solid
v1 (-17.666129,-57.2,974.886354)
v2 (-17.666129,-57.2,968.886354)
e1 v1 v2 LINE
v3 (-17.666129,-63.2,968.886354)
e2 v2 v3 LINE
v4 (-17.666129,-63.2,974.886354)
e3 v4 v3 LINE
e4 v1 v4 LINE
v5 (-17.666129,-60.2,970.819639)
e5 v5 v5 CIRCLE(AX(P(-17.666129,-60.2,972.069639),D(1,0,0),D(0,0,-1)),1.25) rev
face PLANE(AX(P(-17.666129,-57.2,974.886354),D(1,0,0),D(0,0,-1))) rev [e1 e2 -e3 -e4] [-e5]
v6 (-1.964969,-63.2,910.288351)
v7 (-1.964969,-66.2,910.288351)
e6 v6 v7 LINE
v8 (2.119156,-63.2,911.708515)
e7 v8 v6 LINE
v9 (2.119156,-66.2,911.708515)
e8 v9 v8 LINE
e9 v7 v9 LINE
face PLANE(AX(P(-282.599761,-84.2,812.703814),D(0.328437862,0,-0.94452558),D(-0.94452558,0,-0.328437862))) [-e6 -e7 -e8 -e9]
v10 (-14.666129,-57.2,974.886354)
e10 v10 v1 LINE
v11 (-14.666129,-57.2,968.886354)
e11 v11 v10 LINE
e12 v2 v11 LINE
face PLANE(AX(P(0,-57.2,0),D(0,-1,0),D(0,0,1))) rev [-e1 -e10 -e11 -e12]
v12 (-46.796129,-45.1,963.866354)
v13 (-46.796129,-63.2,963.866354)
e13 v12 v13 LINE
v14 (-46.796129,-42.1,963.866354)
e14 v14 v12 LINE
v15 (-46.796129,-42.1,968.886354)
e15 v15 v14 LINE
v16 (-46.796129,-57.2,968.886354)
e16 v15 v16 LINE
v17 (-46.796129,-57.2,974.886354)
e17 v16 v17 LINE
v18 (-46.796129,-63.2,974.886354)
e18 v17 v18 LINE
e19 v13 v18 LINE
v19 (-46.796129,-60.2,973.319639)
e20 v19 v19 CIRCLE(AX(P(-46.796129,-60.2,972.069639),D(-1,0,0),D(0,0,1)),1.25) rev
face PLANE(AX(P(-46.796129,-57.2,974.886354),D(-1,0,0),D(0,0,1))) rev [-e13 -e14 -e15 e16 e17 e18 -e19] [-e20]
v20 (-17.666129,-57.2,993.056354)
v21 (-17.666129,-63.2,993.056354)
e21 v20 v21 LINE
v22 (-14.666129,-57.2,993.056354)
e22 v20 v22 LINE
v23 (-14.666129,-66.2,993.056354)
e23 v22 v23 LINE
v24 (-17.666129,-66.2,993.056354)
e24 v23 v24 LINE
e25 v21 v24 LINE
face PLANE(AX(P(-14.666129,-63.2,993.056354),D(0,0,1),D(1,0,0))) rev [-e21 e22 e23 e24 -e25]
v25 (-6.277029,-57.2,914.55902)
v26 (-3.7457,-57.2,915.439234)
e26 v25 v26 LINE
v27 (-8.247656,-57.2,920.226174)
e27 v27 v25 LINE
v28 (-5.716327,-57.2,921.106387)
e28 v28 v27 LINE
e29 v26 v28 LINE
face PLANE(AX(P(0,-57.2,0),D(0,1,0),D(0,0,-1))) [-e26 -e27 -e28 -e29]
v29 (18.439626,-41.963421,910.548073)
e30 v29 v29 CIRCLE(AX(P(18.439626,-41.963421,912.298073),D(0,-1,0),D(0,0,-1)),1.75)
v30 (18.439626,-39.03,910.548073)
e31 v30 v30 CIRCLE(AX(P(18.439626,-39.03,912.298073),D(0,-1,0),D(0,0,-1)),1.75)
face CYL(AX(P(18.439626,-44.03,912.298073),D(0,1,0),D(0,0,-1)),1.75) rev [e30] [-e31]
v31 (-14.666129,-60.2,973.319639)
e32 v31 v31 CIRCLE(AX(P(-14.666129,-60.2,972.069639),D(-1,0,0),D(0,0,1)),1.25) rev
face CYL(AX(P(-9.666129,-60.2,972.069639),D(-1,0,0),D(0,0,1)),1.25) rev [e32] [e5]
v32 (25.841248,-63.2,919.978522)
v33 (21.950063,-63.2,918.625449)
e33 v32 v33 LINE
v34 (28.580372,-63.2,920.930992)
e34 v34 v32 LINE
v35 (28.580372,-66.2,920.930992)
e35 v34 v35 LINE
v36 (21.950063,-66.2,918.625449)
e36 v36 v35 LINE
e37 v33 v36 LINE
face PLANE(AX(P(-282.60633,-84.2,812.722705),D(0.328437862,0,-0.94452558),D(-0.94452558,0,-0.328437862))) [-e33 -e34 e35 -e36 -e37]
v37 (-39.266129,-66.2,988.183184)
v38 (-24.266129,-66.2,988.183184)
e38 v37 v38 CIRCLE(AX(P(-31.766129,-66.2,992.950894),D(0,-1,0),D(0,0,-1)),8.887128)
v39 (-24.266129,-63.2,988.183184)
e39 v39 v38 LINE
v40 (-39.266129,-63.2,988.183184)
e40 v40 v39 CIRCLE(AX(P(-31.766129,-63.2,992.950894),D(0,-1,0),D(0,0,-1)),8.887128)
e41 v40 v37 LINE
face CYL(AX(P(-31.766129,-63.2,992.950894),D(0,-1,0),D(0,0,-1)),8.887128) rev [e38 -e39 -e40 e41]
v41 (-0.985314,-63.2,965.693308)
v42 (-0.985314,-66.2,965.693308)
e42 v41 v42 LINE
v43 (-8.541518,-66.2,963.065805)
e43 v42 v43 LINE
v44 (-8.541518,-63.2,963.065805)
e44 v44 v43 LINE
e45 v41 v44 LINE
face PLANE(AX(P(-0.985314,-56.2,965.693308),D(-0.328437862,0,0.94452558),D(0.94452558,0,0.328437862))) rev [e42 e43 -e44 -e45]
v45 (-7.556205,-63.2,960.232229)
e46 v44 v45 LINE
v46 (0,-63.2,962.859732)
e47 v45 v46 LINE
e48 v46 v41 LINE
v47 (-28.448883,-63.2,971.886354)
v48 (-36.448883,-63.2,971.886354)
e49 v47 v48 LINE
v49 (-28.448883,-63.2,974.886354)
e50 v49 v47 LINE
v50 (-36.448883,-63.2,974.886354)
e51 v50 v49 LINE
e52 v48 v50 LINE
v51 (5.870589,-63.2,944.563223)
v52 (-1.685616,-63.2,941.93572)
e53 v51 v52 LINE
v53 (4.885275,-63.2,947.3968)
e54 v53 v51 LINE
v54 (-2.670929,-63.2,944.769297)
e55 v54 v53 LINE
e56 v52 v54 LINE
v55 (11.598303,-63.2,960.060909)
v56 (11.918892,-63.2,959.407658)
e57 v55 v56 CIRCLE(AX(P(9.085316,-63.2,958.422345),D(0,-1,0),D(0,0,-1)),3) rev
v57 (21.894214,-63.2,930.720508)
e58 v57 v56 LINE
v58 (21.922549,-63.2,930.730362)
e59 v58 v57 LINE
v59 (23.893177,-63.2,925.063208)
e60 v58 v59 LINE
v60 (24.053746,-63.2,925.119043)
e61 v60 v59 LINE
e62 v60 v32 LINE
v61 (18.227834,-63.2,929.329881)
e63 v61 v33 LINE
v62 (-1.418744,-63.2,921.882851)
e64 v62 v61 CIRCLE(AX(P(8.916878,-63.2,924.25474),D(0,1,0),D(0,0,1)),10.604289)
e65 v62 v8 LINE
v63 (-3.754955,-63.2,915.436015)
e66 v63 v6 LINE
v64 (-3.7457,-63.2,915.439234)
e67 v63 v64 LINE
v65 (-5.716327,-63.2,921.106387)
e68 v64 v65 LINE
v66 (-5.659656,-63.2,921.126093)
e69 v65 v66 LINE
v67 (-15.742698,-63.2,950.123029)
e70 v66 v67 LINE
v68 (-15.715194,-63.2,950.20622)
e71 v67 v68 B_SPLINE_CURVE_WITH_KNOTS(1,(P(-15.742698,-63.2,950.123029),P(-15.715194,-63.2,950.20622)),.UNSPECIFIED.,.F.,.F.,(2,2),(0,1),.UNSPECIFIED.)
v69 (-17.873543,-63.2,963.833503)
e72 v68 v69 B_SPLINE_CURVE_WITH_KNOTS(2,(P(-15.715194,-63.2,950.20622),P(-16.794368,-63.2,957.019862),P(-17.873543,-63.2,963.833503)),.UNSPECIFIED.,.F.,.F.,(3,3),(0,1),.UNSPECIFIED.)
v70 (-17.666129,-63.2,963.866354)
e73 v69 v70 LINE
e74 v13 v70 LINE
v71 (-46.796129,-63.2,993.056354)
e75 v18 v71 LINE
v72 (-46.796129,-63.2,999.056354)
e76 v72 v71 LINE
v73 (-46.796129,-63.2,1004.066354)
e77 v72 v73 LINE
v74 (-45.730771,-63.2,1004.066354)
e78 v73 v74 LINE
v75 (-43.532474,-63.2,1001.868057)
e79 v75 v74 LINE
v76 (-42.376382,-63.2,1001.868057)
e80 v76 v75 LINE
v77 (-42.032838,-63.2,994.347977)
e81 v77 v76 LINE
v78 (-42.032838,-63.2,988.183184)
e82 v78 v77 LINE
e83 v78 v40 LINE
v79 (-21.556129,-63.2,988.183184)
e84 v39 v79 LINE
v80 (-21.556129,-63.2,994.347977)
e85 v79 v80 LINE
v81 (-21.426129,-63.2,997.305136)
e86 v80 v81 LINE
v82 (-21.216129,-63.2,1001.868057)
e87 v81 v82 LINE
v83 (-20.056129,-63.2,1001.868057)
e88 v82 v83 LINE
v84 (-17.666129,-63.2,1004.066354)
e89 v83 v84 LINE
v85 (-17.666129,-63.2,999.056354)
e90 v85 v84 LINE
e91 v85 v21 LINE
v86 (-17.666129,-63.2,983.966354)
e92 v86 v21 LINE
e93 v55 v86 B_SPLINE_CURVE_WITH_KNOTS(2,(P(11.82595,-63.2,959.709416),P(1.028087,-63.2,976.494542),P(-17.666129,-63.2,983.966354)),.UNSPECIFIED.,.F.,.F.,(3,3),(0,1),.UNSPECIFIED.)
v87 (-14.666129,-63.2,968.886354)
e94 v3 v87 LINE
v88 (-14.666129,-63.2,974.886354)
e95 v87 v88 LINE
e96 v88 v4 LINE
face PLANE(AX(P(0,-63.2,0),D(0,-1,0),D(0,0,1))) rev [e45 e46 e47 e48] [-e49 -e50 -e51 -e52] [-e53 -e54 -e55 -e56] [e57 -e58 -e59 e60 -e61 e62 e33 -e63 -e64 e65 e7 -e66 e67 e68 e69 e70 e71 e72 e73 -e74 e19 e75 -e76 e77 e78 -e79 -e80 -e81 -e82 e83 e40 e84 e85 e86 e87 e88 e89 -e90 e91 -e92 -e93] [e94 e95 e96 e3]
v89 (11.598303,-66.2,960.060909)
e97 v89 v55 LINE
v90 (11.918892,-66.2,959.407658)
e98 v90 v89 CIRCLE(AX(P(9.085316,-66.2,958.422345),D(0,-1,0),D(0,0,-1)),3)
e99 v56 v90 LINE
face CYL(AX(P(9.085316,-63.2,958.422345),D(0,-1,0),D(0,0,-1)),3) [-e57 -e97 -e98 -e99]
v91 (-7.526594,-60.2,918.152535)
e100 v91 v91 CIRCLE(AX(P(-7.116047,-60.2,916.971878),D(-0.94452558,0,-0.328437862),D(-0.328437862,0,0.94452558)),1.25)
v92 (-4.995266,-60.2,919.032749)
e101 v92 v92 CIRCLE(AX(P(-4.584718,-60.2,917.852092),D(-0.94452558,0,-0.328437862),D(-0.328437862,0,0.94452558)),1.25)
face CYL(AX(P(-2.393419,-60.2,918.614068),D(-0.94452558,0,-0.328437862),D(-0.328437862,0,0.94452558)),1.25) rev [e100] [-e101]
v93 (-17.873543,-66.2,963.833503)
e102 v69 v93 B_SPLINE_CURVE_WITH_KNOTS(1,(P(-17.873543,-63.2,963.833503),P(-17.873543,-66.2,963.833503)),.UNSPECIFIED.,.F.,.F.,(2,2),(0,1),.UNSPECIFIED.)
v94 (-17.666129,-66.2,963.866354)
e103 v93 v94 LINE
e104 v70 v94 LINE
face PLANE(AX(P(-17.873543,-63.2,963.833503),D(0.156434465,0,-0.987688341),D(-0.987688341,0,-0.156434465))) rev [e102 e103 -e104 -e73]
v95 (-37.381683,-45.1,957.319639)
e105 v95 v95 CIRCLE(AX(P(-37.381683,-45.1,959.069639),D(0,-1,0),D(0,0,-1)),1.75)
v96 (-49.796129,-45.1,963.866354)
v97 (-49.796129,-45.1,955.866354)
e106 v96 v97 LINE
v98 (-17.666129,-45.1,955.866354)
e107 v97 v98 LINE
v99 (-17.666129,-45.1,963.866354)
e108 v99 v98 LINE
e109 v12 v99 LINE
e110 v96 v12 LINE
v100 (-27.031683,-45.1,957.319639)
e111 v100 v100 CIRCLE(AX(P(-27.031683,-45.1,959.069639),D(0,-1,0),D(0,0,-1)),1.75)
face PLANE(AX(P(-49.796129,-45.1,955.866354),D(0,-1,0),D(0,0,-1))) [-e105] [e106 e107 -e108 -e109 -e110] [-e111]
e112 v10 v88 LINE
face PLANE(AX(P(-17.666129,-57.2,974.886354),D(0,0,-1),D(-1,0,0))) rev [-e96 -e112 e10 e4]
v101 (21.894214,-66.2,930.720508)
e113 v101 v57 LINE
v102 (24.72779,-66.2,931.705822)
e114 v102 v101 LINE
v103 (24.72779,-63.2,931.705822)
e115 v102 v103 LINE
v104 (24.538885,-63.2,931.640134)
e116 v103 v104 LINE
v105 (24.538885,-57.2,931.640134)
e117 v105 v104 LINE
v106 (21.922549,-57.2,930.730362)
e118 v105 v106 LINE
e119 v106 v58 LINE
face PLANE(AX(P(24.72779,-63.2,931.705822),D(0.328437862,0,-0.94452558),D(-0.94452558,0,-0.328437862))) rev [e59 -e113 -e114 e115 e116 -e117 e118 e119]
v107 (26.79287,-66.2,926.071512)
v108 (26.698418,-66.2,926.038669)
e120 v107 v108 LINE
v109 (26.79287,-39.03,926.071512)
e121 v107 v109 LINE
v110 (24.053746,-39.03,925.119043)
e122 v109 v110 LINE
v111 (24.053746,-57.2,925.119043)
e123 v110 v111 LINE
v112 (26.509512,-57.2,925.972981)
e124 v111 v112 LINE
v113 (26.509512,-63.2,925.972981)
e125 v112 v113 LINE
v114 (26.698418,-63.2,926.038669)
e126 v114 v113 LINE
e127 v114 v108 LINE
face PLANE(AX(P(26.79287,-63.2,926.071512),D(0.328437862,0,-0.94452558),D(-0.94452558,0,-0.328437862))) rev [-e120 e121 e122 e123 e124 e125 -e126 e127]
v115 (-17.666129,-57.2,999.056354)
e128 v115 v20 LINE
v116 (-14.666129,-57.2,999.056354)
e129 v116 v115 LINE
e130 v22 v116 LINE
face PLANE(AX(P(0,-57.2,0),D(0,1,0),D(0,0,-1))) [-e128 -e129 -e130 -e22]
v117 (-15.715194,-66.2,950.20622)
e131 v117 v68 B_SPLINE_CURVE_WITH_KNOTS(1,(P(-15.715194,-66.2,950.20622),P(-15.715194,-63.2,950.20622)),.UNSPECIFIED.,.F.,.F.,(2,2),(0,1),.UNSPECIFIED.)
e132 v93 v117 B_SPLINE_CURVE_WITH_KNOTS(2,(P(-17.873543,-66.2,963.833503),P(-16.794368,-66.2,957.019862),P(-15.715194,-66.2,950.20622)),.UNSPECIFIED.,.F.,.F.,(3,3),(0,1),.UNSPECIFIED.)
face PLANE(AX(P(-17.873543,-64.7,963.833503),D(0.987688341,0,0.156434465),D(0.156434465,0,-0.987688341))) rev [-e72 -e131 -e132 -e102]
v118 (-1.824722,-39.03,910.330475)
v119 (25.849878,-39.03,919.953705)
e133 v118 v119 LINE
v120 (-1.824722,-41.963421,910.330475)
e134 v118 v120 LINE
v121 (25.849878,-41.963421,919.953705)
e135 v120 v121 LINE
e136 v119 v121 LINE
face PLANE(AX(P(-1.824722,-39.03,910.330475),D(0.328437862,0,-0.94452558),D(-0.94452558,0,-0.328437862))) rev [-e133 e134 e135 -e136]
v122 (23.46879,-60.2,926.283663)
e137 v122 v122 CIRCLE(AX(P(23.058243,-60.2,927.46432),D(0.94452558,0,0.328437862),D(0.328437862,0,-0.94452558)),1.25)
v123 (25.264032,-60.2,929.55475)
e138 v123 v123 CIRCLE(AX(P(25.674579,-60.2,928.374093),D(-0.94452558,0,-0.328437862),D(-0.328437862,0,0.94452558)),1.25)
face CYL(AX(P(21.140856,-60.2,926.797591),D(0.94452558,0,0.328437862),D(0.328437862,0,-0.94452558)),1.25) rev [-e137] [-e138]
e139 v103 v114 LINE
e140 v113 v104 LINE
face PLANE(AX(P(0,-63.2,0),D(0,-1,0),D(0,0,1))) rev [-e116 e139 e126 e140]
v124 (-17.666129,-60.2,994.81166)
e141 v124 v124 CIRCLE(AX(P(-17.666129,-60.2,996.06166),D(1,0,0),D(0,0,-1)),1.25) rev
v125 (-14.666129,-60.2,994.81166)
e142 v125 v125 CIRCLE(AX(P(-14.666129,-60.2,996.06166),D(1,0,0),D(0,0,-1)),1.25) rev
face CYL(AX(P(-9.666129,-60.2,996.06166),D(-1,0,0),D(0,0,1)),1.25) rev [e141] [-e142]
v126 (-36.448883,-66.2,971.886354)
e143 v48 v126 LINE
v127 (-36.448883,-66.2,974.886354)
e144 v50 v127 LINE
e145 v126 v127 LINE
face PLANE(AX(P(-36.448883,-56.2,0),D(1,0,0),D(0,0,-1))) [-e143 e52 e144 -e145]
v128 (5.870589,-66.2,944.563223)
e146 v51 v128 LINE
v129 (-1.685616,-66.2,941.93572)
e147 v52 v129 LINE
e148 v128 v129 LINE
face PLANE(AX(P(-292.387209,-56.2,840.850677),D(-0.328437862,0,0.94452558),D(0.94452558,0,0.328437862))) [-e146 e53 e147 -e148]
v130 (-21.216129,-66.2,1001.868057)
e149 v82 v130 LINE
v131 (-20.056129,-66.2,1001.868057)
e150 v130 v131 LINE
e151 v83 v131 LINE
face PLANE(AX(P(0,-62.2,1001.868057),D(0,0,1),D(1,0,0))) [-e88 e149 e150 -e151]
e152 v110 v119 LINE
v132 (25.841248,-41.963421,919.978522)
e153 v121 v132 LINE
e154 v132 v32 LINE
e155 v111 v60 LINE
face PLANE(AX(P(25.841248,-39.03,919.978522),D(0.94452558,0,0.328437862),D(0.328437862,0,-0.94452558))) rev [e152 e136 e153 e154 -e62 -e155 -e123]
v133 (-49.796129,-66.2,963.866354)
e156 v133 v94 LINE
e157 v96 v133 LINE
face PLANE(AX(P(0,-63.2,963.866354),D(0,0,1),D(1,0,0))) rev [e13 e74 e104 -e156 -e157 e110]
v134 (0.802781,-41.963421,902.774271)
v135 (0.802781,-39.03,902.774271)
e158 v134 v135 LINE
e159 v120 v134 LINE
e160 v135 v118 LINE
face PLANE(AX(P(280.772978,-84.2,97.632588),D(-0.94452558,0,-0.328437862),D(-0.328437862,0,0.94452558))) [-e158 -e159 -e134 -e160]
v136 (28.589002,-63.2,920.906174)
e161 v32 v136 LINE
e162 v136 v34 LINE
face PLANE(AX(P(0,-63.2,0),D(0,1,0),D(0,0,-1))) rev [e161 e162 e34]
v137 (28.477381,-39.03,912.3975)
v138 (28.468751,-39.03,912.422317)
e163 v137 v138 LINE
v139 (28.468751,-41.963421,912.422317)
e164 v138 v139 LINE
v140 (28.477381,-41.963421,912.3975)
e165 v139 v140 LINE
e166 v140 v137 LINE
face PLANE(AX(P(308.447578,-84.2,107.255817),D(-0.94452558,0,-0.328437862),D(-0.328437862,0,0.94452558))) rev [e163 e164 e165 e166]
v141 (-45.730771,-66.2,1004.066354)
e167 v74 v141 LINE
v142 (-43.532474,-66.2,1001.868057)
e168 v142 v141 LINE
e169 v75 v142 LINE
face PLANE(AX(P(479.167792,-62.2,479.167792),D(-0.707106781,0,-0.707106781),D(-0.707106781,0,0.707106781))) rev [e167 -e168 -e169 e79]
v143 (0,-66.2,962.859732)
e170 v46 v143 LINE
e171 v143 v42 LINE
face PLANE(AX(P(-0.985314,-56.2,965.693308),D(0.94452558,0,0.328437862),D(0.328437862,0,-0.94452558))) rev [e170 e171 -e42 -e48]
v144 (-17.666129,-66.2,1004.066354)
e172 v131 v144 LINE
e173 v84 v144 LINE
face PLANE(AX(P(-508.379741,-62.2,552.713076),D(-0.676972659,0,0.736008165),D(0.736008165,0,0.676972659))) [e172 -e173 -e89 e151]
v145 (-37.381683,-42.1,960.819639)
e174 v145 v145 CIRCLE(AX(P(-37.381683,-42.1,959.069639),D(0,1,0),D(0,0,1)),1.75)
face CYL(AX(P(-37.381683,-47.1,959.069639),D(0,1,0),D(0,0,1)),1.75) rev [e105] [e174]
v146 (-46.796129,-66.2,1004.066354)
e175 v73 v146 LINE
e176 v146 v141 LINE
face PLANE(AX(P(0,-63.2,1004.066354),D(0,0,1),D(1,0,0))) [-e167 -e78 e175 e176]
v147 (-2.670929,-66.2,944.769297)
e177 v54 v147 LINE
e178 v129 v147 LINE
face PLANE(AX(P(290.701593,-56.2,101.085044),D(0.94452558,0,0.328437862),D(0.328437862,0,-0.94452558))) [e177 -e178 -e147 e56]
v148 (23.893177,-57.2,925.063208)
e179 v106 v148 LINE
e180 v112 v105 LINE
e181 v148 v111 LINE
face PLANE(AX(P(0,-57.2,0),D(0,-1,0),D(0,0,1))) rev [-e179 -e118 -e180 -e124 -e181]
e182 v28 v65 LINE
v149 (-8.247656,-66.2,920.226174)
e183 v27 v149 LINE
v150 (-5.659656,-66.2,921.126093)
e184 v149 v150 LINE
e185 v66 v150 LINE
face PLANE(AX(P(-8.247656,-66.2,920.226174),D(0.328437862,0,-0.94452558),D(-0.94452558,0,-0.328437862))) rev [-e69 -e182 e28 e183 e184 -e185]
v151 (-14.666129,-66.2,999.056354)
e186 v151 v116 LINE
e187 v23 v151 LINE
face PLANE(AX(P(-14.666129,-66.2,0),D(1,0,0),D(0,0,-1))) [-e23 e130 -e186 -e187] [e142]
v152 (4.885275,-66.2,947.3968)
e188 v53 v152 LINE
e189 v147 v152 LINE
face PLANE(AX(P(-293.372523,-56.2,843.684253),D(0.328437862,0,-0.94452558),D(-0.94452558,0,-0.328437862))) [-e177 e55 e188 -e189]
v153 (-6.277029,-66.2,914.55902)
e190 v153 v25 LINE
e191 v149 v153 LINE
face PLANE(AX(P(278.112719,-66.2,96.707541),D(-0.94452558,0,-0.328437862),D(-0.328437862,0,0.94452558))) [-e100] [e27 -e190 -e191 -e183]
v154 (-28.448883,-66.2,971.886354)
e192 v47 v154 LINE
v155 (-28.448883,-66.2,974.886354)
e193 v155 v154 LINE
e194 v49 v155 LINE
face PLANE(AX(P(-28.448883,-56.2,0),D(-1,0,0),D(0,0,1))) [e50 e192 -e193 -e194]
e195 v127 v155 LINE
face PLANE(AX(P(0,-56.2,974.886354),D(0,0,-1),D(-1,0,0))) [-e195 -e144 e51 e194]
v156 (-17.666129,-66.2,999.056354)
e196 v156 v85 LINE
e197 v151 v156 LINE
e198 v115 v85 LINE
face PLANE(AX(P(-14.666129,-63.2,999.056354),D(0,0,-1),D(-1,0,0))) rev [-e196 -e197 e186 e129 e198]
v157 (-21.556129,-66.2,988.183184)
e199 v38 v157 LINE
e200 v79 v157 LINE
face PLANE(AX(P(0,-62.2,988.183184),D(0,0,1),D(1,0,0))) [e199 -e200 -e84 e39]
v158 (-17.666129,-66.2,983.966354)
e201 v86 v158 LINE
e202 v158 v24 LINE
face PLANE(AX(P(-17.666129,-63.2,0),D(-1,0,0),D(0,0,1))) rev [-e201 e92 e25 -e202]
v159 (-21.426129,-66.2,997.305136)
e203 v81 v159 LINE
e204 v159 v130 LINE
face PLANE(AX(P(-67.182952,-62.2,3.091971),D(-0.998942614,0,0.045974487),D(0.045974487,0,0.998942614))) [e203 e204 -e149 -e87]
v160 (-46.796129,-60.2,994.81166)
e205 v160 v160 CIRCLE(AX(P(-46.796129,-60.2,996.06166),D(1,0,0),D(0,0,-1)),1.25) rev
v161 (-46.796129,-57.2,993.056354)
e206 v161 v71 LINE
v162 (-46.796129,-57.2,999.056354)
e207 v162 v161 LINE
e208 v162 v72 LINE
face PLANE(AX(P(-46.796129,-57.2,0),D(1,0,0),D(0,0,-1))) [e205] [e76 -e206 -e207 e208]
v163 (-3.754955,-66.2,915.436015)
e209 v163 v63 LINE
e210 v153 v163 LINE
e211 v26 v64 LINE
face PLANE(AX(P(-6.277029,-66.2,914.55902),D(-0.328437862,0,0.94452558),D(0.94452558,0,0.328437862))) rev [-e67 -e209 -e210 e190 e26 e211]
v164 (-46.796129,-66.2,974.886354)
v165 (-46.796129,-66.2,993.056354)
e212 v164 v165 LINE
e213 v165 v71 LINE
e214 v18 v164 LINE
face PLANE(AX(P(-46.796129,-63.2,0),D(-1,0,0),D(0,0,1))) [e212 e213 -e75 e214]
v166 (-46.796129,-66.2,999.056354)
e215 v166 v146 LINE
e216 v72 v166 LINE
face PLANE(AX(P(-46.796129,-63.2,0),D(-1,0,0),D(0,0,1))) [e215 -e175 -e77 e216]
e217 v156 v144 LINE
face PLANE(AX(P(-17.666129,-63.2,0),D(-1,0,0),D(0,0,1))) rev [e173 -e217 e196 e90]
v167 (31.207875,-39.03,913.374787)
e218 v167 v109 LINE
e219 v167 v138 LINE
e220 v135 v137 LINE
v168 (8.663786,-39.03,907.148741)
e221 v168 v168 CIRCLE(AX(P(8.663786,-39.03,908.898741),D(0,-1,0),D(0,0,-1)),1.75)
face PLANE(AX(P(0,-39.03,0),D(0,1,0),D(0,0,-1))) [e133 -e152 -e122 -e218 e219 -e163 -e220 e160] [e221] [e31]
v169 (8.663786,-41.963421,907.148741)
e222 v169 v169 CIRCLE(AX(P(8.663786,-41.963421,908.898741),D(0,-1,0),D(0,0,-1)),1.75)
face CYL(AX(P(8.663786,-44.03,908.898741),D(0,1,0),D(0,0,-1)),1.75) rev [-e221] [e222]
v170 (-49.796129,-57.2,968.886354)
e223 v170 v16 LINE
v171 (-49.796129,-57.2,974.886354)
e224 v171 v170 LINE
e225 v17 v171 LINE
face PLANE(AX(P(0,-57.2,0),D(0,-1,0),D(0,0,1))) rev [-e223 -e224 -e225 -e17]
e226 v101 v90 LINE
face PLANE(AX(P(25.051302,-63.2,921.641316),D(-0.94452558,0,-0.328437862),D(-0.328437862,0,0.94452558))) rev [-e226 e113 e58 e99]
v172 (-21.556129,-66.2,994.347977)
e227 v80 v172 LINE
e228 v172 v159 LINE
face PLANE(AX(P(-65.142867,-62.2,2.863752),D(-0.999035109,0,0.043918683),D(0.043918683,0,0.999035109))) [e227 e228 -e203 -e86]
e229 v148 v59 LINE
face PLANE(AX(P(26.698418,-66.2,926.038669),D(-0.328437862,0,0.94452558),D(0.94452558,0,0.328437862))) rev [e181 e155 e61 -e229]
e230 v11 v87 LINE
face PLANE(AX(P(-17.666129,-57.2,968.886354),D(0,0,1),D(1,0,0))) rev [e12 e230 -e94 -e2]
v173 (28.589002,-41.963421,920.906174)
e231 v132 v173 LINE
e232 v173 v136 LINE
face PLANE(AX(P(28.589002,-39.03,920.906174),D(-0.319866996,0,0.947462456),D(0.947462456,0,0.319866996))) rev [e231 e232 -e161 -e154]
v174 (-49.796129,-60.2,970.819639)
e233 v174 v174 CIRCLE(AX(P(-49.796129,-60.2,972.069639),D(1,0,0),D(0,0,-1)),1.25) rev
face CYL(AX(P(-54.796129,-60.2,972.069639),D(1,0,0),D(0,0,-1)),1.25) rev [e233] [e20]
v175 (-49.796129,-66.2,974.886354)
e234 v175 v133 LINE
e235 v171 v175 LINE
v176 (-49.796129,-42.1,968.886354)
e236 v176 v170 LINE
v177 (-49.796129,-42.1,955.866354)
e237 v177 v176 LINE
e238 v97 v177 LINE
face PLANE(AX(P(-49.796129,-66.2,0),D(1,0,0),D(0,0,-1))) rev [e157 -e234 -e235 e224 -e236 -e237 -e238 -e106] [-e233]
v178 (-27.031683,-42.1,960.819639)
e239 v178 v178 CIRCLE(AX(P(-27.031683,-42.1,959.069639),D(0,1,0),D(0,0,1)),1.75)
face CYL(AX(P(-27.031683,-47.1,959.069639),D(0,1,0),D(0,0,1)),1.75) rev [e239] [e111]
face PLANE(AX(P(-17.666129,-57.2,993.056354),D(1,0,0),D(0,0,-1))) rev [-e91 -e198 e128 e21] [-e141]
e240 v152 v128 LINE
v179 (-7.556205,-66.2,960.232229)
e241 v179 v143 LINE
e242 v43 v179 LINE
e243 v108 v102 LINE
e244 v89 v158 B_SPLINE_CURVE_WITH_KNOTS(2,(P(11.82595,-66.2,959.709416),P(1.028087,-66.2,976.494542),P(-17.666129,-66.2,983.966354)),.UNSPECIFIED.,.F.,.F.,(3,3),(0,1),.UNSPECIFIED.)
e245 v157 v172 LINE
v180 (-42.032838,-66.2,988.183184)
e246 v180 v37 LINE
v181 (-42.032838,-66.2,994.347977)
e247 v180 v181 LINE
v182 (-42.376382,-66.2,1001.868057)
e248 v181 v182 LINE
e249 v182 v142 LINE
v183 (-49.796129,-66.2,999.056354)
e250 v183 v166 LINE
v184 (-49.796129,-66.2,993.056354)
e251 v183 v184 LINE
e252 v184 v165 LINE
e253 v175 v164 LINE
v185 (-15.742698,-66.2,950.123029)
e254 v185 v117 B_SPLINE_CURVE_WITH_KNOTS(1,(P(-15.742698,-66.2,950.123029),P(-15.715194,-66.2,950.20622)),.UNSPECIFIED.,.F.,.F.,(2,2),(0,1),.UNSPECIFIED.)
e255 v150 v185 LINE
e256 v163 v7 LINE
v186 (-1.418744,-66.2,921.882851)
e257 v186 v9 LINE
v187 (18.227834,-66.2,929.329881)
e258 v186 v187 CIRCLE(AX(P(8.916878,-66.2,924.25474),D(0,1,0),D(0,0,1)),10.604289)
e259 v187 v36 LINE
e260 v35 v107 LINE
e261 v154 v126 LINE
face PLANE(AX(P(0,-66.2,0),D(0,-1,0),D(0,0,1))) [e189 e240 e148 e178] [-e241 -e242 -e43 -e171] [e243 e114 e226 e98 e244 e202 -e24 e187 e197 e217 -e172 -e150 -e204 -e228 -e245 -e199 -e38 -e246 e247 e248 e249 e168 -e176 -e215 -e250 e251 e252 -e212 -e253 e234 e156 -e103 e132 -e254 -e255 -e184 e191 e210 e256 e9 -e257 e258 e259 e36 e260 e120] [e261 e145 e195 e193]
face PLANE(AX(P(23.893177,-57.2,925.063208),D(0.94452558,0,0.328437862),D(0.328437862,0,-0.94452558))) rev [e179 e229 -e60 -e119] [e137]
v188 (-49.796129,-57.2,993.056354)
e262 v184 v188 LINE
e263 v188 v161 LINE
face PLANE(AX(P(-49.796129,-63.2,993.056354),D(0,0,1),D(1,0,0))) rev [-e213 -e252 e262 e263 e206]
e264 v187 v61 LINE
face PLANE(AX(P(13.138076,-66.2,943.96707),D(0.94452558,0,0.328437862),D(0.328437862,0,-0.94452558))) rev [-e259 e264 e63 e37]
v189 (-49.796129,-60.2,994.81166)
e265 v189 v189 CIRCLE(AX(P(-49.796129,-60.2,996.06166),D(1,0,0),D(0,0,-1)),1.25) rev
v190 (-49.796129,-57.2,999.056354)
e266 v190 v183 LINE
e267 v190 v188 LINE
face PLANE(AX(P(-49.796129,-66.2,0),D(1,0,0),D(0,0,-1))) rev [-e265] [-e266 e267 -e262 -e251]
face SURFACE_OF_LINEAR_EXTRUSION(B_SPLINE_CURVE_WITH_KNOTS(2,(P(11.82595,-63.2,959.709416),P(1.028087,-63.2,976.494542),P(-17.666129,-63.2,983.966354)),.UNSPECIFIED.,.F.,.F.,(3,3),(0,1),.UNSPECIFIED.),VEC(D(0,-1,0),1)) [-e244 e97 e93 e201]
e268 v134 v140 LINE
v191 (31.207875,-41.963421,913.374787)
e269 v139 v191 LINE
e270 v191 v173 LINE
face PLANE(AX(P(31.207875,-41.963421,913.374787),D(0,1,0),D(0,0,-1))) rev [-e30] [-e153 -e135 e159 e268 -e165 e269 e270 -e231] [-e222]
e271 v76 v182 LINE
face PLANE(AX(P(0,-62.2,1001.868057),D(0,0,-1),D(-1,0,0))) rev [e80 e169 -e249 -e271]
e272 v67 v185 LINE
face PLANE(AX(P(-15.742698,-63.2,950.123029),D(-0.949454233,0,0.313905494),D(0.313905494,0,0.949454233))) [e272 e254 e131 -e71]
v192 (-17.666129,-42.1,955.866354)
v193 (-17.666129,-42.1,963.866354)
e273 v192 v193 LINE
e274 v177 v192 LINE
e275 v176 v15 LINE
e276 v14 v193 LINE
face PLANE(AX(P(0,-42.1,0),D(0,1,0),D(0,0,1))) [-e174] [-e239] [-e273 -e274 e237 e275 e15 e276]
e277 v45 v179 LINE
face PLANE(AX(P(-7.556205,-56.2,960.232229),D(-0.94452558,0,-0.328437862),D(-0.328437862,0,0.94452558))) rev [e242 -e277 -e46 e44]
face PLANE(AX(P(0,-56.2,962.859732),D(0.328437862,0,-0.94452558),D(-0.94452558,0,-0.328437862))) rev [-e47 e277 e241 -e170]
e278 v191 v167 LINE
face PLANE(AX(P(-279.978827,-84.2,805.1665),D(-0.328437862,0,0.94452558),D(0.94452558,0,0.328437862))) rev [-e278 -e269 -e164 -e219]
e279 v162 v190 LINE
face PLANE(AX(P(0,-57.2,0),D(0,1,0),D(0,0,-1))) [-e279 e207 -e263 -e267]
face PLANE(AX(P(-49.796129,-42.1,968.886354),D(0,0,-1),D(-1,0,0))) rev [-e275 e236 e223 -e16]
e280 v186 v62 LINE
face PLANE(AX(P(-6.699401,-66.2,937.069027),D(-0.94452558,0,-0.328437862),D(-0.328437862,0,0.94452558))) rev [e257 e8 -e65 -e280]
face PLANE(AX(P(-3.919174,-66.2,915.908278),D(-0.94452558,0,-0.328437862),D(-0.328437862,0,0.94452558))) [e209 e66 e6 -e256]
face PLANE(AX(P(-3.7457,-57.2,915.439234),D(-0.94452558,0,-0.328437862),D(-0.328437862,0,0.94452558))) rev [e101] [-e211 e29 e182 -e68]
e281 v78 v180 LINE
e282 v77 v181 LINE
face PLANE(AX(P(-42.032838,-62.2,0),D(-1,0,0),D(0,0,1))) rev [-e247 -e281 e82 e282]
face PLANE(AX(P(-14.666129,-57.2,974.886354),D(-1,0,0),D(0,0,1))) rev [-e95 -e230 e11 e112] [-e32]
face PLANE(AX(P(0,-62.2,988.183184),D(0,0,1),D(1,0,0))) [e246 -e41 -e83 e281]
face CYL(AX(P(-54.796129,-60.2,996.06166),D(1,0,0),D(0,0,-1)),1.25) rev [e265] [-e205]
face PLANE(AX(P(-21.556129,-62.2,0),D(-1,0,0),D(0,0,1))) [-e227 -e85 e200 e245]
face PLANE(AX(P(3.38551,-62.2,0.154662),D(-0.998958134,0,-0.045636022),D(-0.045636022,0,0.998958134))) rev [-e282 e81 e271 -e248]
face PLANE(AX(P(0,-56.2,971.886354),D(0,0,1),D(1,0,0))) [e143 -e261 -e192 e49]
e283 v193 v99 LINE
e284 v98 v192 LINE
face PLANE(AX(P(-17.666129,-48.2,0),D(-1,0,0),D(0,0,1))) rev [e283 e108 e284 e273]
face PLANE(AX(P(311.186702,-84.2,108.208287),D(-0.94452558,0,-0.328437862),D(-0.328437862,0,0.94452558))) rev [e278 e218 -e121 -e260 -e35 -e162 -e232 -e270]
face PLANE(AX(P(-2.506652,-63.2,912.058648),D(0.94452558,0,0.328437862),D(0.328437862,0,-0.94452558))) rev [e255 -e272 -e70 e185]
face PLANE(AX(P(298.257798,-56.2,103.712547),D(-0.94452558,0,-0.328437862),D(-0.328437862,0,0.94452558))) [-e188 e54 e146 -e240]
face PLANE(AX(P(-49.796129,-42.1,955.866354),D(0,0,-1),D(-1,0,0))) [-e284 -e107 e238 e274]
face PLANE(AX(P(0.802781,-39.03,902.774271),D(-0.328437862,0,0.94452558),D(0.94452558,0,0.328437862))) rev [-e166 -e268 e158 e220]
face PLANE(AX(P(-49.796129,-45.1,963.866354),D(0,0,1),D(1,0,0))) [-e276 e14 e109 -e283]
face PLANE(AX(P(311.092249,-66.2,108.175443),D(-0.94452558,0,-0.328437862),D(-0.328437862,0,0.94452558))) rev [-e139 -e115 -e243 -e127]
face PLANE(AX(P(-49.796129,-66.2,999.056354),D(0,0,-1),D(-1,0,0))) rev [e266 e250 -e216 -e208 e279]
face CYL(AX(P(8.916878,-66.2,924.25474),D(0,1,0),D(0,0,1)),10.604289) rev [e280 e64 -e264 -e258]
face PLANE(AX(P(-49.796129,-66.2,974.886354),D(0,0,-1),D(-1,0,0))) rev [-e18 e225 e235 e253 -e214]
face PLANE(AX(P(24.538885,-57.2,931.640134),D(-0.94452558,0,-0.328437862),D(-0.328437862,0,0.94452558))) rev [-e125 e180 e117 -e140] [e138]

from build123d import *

# Parameters (mm, degrees)
SKETCH1_W                 = 29.13
SKETCH1_H                 = 40.2
BOSS_EXTRUDE1_DEPTH       = 3
SKETCH3_W                 = 6
SKETCH3_H                 = 3
BOSS_EXTRUDE2_DEPTH       = 3
SKETCH4_W                 = 3
SKETCH4_H                 = 6
BOSS_EXTRUDE3_DEPTH       = 6
SKETCH6_W                 = 6
SKETCH6_H                 = 3
BOSS_EXTRUDE4_DEPTH       = 5
SKETCH7_W                 = 3.000000005
SKETCH7_H                 = 6
BOSS_EXTRUDE6_DEPTH       = 6
SKETCH11_W                = 6
SKETCH11_H                = 3
BOSS_EXTRUDE7_DEPTH       = 3
SKETCH19_W                = 3
SKETCH19_H                = 6
BOSS_EXTRUDE11_DEPTH      = 6
SKETCH21_W                = 6
SKETCH21_H                = 3
BOSS_EXTRUDE12_DEPTH      = 3
SKETCH22_W                = 3
SKETCH22_H                = 6
BOSS_EXTRUDE13_DEPTH      = 6
CUT_EXTRUDE11_DEPTH       = 4
SKETCH30_W                = 25.92
SKETCH30_H                = 3
CUT_EXTRUDE12_DEPTH       = 15
SKETCH33_W                = 29.17650364
SKETCH33_H                = 3
BOSS_EXTRUDE14_DEPTH      = 40.3
SKETCH34_W                = 21.00258235
SKETCH34_H                = 3
CUT_EXTRUDE15_DEPTH       = 25
CUT_EXTRUDE16_DEPTH       = 5
SKETCH37_W                = 4.5
SKETCH37_H                = 3
SKETCH37_W_2              = 1.5
BOSS_EXTRUDE15_DEPTH      = 3
BOSS_EXTRUDE16_DEPTH      = 6
SKETCH41_W                = 6
SKETCH41_H                = 3
BOSS_EXTRUDE17_DEPTH      = 3
BOSS_EXTRUDE18_DEPTH      = 6
SKETCH46_W                = 5.02
SKETCH46_H                = 3
BOSS_EXTRUDE19_DEPTH      = 3
SKETCH48_W                = 3
SKETCH48_H                = 5.02
BOSS_EXTRUDE20_DEPTH      = 21.1
BOSS_EXTRUDE22_DEPTH      = 29.13
BOSS_EXTRUDE22_DEPTH_BACK = 3
SKETCH50_W                = 8
SKETCH50_H                = 3
SKETCH51_R                = 1.75
CUT_EXTRUDE21_DEPTH       = 5
SKETCH56_W                = 3.994197227
SKETCH56_H                = 3.994197227
CUT_EXTRUDE26_DEPTH       = 0.1
FILLET4_START             = -19
FILLET4_DEPTH             = 5
BOSS_EXTRUDE28_DEPTH      = 0.21
BOSS_EXTRUDE29_DEPTH      = 3
BOSS_EXTRUDE30_DEPTH      = 1.95
BOSS_EXTRUDE30_DEPTH_BACK = 4
SKETCH68_W                = 4.32399603
SKETCH68_H                = 3
SKETCH69_W                = 3.919724064
SKETCH69_H                = 3
BOSS_EXTRUDE31_DEPTH      = 1.83
SKETCH70_W                = 5.44243662
SKETCH70_H                = 3
BOSS_EXTRUDE32_DEPTH      = 3.1
BOSS_EXTRUDE33_DEPTH      = 24.17
SKETCH72_W                = 2.9
SKETCH72_H                = 2.93342148
BOSS_EXTRUDE34_DEPTH      = 8
SKETCH73_W                = 8
SKETCH73_H                = 2.93342148
BOSS_EXTRUDE35_DEPTH      = 29.3
SKETCH74_R                = 1.749999995
CUT_EXTRUDE27_DEPTH       = 5
CUT_EXTRUDE28_DEPTH       = 5
CUT_EXTRUDE28_DEPTH_BACK  = 5
SKETCH75_R                = 1.25
SKETCH75_R_2              = 1.249999999
CUT_EXTRUDE29_DEPTH       = 5
CUT_EXTRUDE29_DEPTH_BACK  = 5
SKETCH76_R                = 1.25
SKETCH77_R                = 1.25
CUT_EXTRUDE30_DEPTH       = 5
SKETCH78_R                = 1.25
CUT_EXTRUDE31_DEPTH       = 5
BOSS_EXTRUDE36_DEPTH      = 3
BOSS_EXTRUDE38_DEPTH      = 3
CUT_EXTRUDE32_DEPTH       = 10
CUT_EXTRUDE33_DEPTH       = 10
CUT_EXTRUDE34_DEPTH       = 10


with BuildPart() as part:
    # Sketch1 → Boss-Extrude1 (new body)
    with BuildSketch(Plane(origin=(0, 0, 0), x_dir=(1, 0, 0), z_dir=(0, 1, 0))):
        with Locations((-32.231128585, -983.966354464)):
            Rectangle(SKETCH1_W, SKETCH1_H)
        with BuildLine():
            Line((-15.507778999, -950.239071497), (-17.666128585, -963.866354464))
            Line((-17.666128585, -963.866354464), (-17.666128585, -983.966354464))
            add(Edge.make_bspline(
                [(11.825950039, -959.709415703), (1.028086592, -976.494542347), (-17.666128585, -983.966354464)],
                knots=[0, 0, 0, 1, 1, 1], degree=2))
            Line((11.825950039, -959.709415703), (-15.497121464, -950.208422428))
            Line((-15.497121464, -950.208422428), (-15.507778999, -950.239071497))
        make_face()
    extrude(amount=-BOSS_EXTRUDE1_DEPTH)

    # Sketch3 → Boss-Extrude2 (add)
    with BuildSketch(Plane.ZY.offset(46.796128585)):
        with Locations((971.886354464, -1.5)):
            Rectangle(SKETCH3_W, SKETCH3_H)
    extrude(amount=BOSS_EXTRUDE2_DEPTH)

    # Sketch4 → Boss-Extrude3 (add)
    with BuildSketch(Plane.XZ.offset(3)):
        with Locations((-48.296128585, 971.886354464)):
            Rectangle(SKETCH4_W, SKETCH4_H)
    extrude(amount=BOSS_EXTRUDE3_DEPTH)

    # Sketch6 → Boss-Extrude4 (add)
    with BuildSketch(Plane(origin=(-17.666128585, 0, 0), x_dir=(0, 0, -1), z_dir=(1, 0, 0))):
        with Locations((-971.886354464, -1.5)):
            Rectangle(SKETCH6_W, SKETCH6_H)
    extrude(amount=BOSS_EXTRUDE4_DEPTH)

    # Sketch7 → Boss-Extrude6 (add)
    with BuildSketch(Plane.XZ.offset(3)):
        with Locations((-16.166128583, 971.886354464)):
            Rectangle(SKETCH7_W, SKETCH7_H)
    extrude(amount=BOSS_EXTRUDE6_DEPTH)

    # Sketch11 → Boss-Extrude7 (add)
    with BuildSketch(Plane.ZY.offset(46.796128585)):
        with Locations((996.056354464, -1.5)):
            Rectangle(SKETCH11_W, SKETCH11_H)
    extrude(amount=BOSS_EXTRUDE7_DEPTH)

    # Sketch19 → Boss-Extrude11 (add)
    with BuildSketch(Plane.XZ.offset(3)):
        with Locations((-48.296128585, 996.056354464)):
            Rectangle(SKETCH19_W, SKETCH19_H)
    extrude(amount=BOSS_EXTRUDE11_DEPTH)

    # Sketch21 → Boss-Extrude12 (add)
    with BuildSketch(Plane(origin=(-17.666128585, 0, 0), x_dir=(0, 0, -1), z_dir=(1, 0, 0))):
        with Locations((-996.056354464, -1.5)):
            Rectangle(SKETCH21_W, SKETCH21_H)
    extrude(amount=BOSS_EXTRUDE12_DEPTH)

    # Sketch22 → Boss-Extrude13 (add)
    with BuildSketch(Plane.XZ.offset(3)):
        with Locations((-16.166128585, 996.056354464)):
            Rectangle(SKETCH22_W, SKETCH22_H)
    extrude(amount=BOSS_EXTRUDE13_DEPTH)

    # Sketch29 → Cut-Extrude11 (cut)
    with BuildSketch(Plane(origin=(0, 0, 0), x_dir=(1, 0, 0), z_dir=(0, 1, 0))):
        Polygon((-39.266128585, -988.183184315), (-42.032837695, -988.183184315), (-42.032837695, -994.347976596), (-42.376382193, -1001.868057312), (-43.532474114, -1001.868057312), (-45.730771266, -1004.066354464), (-39.266128585, -1004.066354464), align=None)
        Polygon((-24.371913352, -988.183184315), (-24.371913352, -1004.066354464), (-24.326128585, -1004.066354464), (-17.666128585, -1004.066354464), (-20.056128585, -1001.868057312), (-21.216128585, -1001.868057312), (-21.426128585, -997.305136389), (-21.556128585, -994.347976596), (-21.556128585, -988.183184315), align=None)
    extrude(amount=-CUT_EXTRUDE11_DEPTH, mode=Mode.SUBTRACT)

    # Sketch30 → Cut-Extrude12 (cut)
    with BuildSketch(Plane.ZY.offset(39.266128585)):
        with Locations((991.106354464, -1.5)):
            Rectangle(SKETCH30_W, SKETCH30_H)
    extrude(amount=-CUT_EXTRUDE12_DEPTH, mode=Mode.SUBTRACT)

    # Sketch33 → Boss-Extrude14 (add)
    with BuildSketch(Plane(origin=(-296.443416752, 0, 852.515567448), x_dir=(-0.9445255798324886, 0, -0.32843786176703366), z_dir=(0.3284378617670337, 0, -0.9445255798324887))):
        with Locations((-311.77524668, -1.5)):
            Rectangle(SKETCH33_W, SKETCH33_H)
    extrude(amount=BOSS_EXTRUDE14_DEPTH)

    # Sketch34 → Cut-Extrude15 (cut)
    with BuildSketch(Plane(origin=(-283.207370923, 0, 814.451186581), x_dir=(-0.9445255798324887, 0, -0.32843786176703327), z_dir=(0.32843786176703327, 0, -0.9445255798324887))):
        with Locations((-311.942483261, -1.5)):
            Rectangle(SKETCH34_W, SKETCH34_H)
    extrude(amount=-CUT_EXTRUDE15_DEPTH, mode=Mode.SUBTRACT)

    # Sketch35 → Cut-Extrude16 (cut)
    with BuildSketch(Plane(origin=(0, 0, 0), x_dir=(1, 0, 0), z_dir=(0, 1, 0))):
        Polygon((-6.699400727, -937.069026653), (11.67040627, -948.187810964), (13.138075545, -943.967069892), align=None)
    extrude(amount=-CUT_EXTRUDE16_DEPTH, mode=Mode.SUBTRACT)

    # Sketch37 → Boss-Extrude15 (add)
    with BuildSketch(Plane(origin=(280.946295288, 0, 97.69285498), x_dir=(-0.32843786176743117, 0, 0.9445255798323505), z_dir=(-0.9445255798323505, 0, -0.32843786176743117))):
        with Locations((868.136002588, -1.5)):
            Rectangle(SKETCH37_W, SKETCH37_H)
        with Locations((871.136002588, -1.5)):
            Rectangle(SKETCH37_W_2, SKETCH37_H)
    extrude(amount=BOSS_EXTRUDE15_DEPTH)

    # Sketch39 → Boss-Extrude16 (add)
    with BuildSketch(Plane.XZ.offset(3)):
        Polygon((-6.277028676, 914.559020058), (-3.745700122, 915.439233528), (-5.716327292, 921.106387007), (-8.247655846, 920.226173537), align=None)
    extrude(amount=BOSS_EXTRUDE16_DEPTH)

    # Sketch41 → Boss-Extrude17 (add)
    with BuildSketch(Plane(origin=(308.258672657, 0, 107.190129606), x_dir=(0.3284378617670337, 0, -0.9445255798324887), z_dir=(0.9445255798324887, 0, 0.3284378617670337))):
        with Locations((-868.898439213, -1.5)):
            Rectangle(SKETCH41_W, SKETCH41_H)
    extrude(amount=BOSS_EXTRUDE17_DEPTH)

    # Sketch42 → Boss-Extrude18 (add)
    with BuildSketch(Plane.XZ.offset(3)):
        Polygon((23.893176542, 925.063208116), (21.922549371, 930.730361595), (24.538885227, 931.640134472), (26.509512398, 925.972980993), align=None)
    extrude(amount=BOSS_EXTRUDE18_DEPTH)


with BuildPart() as body_2:
    # Mirror1: mirrored copy
    add(part.part.mirror(Plane(origin=(0, -9, 0), x_dir=(0, 0, 1), z_dir=(0, -1, 0))))

    # Sketch46 → Boss-Extrude19 (add)
    with BuildSketch(Plane.ZY.offset(46.796128585)):
        with Locations((966.376354464, -16.5)):
            Rectangle(SKETCH46_W, SKETCH46_H)
    extrude(amount=BOSS_EXTRUDE19_DEPTH)

    # Sketch48 → Boss-Extrude20 (add)
    with BuildSketch(Plane(origin=(0, -15, 0), x_dir=(1, 0, 0), z_dir=(0, 1, 0))):
        with Locations((-48.296128585, -966.376354464)):
            Rectangle(SKETCH48_W, SKETCH48_H)
    extrude(amount=BOSS_EXTRUDE20_DEPTH)

    # Sketch50 → Boss-Extrude22 (add, two sides: drawn at the far end of the back side and taken through both)
    with BuildSketch(Plane(origin=(-46.796128585, 0, 0), x_dir=(0, 0, -1), z_dir=(1, 0, 0)).offset(-BOSS_EXTRUDE22_DEPTH_BACK)):
        with Locations((-959.866354464, 4.6)):
            Rectangle(SKETCH50_W, SKETCH50_H)
    extrude(amount=BOSS_EXTRUDE22_DEPTH + BOSS_EXTRUDE22_DEPTH_BACK)

    # Sketch51 → Cut-Extrude21 (cut)
    with BuildSketch(Plane(origin=(0, 6.1, 0), x_dir=(1, 0, 0), z_dir=(0, 1, 0))):
        with Locations(Location((-37.381683329, -959.069638856, 0), (0, 0, 270))):
            Circle(SKETCH51_R)
        with Locations(Location((-27.031683329, -959.069638856, 0), (0, 0, 270))):
            Circle(SKETCH51_R)
    extrude(amount=-CUT_EXTRUDE21_DEPTH, mode=Mode.SUBTRACT)

    # Sketch56 → Cut-Extrude26 (cut)
    with BuildSketch(Plane(origin=(-283.207370923, 0, 814.451186581), x_dir=(-0.9445255798324892, 0, -0.32843786176703227), z_dir=(0.32843786176703227, 0, -0.9445255798324892))):
        with Locations((-299.444093473, -16.997098614)):
            Rectangle(SKETCH56_W, SKETCH56_H)
    extrude(amount=-CUT_EXTRUDE26_DEPTH, mode=Mode.SUBTRACT)

    # Fillet4: read off the stored shape, not the designer's step
    # Fillet4 outline → Fillet4 (cut)
    with BuildSketch(Plane(origin=(0, 0, 0), x_dir=(1, 0, 0), z_dir=(0, 1, 0)).offset(FILLET4_START)):
        with BuildLine():
            Line((11.815255904, -959.705697054), (11.918892326, -959.407658179))
            ThreePointArc((11.918892326, -959.407658179), (11.77847749, -959.744040081), (11.598302874, -960.060909482))
            add(Edge.make_bspline(
                [(11.825950039, -959.709415703), (11.712561825, -959.885676085), (11.598302874, -960.060909482)],
                knots=[0, 0, 0, 0.010500986, 0.010500986, 0.010500986], degree=2))
            Line((11.825950039, -959.709415703), (11.815255904, -959.705697054))
        make_face()
    extrude(amount=FILLET4_DEPTH, mode=Mode.SUBTRACT)


with BuildPart() as body_2_2:
    # Mirror2: mirrored copy
    add(body_2.part.mirror(Plane(origin=(-13.851466716, -18, 962.430133816), x_dir=(0, 0, 1), z_dir=(0, -1, 0))))

    # Sketch63 → Boss-Extrude28 (add)
    with BuildSketch(Plane(origin=(131.691734271, 0, 20.857921628), x_dir=(-0.15643446504022615, 0, 0.9876883405951385), z_dir=(-0.9876883405951385, 0, -0.15643446504022615))):
        with BuildLine():
            add(Edge.make_bspline(
                [(954.763151571, -21), (947.864577189, -21), (940.966002807, -21)],
                knots=[0, 0, 0, 1, 1, 1], degree=2))
            Line((940.966002807, -21), (940.966002807, -18))
            add(Edge.make_bspline(
                [(954.763151571, -18), (947.864577189, -18), (940.966002807, -18)],
                knots=[0, 0, 0, 1, 1, 1], degree=2))
            Line((954.763151571, -18), (954.763151571, -21))
        make_face()
    extrude(amount=BOSS_EXTRUDE28_DEPTH)

    # Sketch67 → Boss-Extrude29 (add)
    with BuildSketch(Plane(origin=(0, -18, 0), x_dir=(1, 0, 0), z_dir=(0, 1, 0))):
        Polygon((-15.715193551, -950.206220259), (-15.742698114, -950.123028585), (-15.497121464, -950.208422428), (-15.507778999, -950.239071497), align=None)
    extrude(amount=-BOSS_EXTRUDE29_DEPTH)

    # Sketch68 → Boss-Extrude30 (add, two sides: drawn at the far end of the back side and taken through both)
    with BuildSketch(Plane(origin=(-283.240214709, 0, 814.545639139), x_dir=(-0.9445255798324883, -3.1744861168227707e-15, -0.32843786176703493), z_dir=(0.32843786176703493, -9.129225613729643e-15, -0.9445255798324883)).offset(-BOSS_EXTRUDE30_DEPTH_BACK)):
        with Locations((-299.279194071, -19.5)):
            Rectangle(SKETCH68_W, SKETCH68_H)
    extrude(amount=BOSS_EXTRUDE30_DEPTH + BOSS_EXTRUDE30_DEPTH_BACK)

    # Sketch69 → Boss-Extrude31 (add)
    with BuildSketch(Plane(origin=(-283.207370923, 0, 814.451186581), x_dir=(-0.9445255798324895, 0, -0.32843786176703144), z_dir=(0.32843786176703144, 0, -0.9445255798324895))):
        with Locations((-324.403636468, -19.5)):
            Rectangle(SKETCH69_W, SKETCH69_H)
    extrude(amount=BOSS_EXTRUDE31_DEPTH)

    # Sketch70 → Boss-Extrude32 (add)
    with BuildSketch(Plane(origin=(308.258672657, 0, 107.190129606), x_dir=(0.3284378617670337, 0, -0.9445255798324887), z_dir=(0.9445255798324887, 0, 0.3284378617670337))):
        with Locations((-863.177220903, -19.5)):
            Rectangle(SKETCH70_W, SKETCH70_H)
    extrude(amount=BOSS_EXTRUDE32_DEPTH)

    # Sketch71 → Boss-Extrude33 (add)
    with BuildSketch(Plane.XZ.offset(21)):
        Polygon((28.589002033, 920.906174309), (26.792870072, 926.071512351), (24.05374589, 925.119042552), (25.841248137, 919.978521948), align=None)
    extrude(amount=BOSS_EXTRUDE33_DEPTH)

    # Sketch72 → Boss-Extrude34 (add)
    with BuildSketch(Plane(origin=(-282.606329636, 0, 812.722704769), x_dir=(-0.9445255798324861, 0, -0.3284378617670412), z_dir=(0.3284378617670412, 0, -0.9445255798324861))):
        with Locations((-328.0134985, -43.70328926)):
            Rectangle(SKETCH72_W, SKETCH72_H)
    extrude(amount=BOSS_EXTRUDE34_DEPTH)

    # Sketch73 → Boss-Extrude35 (add)
    with BuildSketch(Plane(origin=(308.447577773, 0, 107.255817179), x_dir=(-0.32843786176701534, 0, 0.9445255798324951), z_dir=(-0.9445255798324951, 0, -0.32843786176701534))):
        with Locations((856.429727564, -43.70328926)):
            Rectangle(SKETCH73_W, SKETCH73_H)
    extrude(amount=BOSS_EXTRUDE35_DEPTH)

    # Sketch74 → Cut-Extrude27 (cut)
    with BuildSketch(Plane.XZ.offset(45.17)):
        with Locations(Location((18.439626133, 912.298073036, 0), (0, 0, 270))):
            Circle(SKETCH74_R)
        with Locations(Location((8.663786379, 908.898741176, 0), (0, 0, 270))):
            Circle(SKETCH74_R)
    extrude(amount=-CUT_EXTRUDE27_DEPTH, mode=Mode.SUBTRACT)


with BuildPart() as body_2_3:
    # Mirror3: read off the stored shape, not the designer's step
    # Mirror3: mirrored copy
    add(body_2_2.part.mirror(Plane(origin=(0, -42.1, 0), x_dir=(1, 0, 0), z_dir=(0, 1, 0))))


with BuildPart() as body_2_4:
    # Mirror4: read off the stored shape, not the designer's step
    # Mirror4: mirrored copy
    add(body_2_3.part.mirror(Plane(origin=(0, -42.1, 0), x_dir=(1, 0, 0), z_dir=(0, 1, 0))))


with BuildPart() as body_2_5:
    # Mirror5: read off the stored shape, not the designer's step
    # Mirror5: mirrored copy
    add(body_2_4.part.mirror(Plane(origin=(0, -42.1, 0), x_dir=(1, 0, 0), z_dir=(0, 1, 0))))

    # Sketch75 → Cut-Extrude28 (cut, two sides: drawn at the far end of the back side and taken through both)
    with BuildSketch(Plane.ZY.offset(49.796128585).offset(-CUT_EXTRUDE28_DEPTH_BACK)):
        with Locations(Location((996.061659537, -60.2, 0), (0, 0, 180))):
            Circle(SKETCH75_R)
        with Locations(Location((972.069638843, -60.199999995, 0), (0, 0, 180))):
            Circle(SKETCH75_R_2)
    extrude(amount=CUT_EXTRUDE28_DEPTH + CUT_EXTRUDE28_DEPTH_BACK, mode=Mode.SUBTRACT)

    # Sketch76 → Cut-Extrude29 (cut, two sides: drawn at the far end of the back side and taken through both)
    with BuildSketch(Plane(origin=(-14.66612858, 0, 0), x_dir=(0, 0, -1), z_dir=(1, 0, 0)).offset(-CUT_EXTRUDE29_DEPTH_BACK)):
        with Locations(Location((-972.069638843, -60.2, 0), (0, 0, 2.32e-07))):
            Circle(SKETCH76_R)
        with Locations((-996.061659537, -60.2)):
            Circle(SKETCH76_R)
    extrude(amount=CUT_EXTRUDE29_DEPTH + CUT_EXTRUDE29_DEPTH_BACK, mode=Mode.SUBTRACT)

    # Sketch77 → Cut-Extrude30 (cut)
    with BuildSketch(Plane(origin=(311.092249396, 0, 108.175443191), x_dir=(0.32843786176703343, 0, -0.9445255798324887), z_dir=(0.9445255798324889, 0, 0.3284378617670335))):
        with Locations((-868.440574332, -60.2)):
            Circle(SKETCH77_R)
    extrude(amount=-CUT_EXTRUDE30_DEPTH, mode=Mode.SUBTRACT)

    # Sketch78 → Cut-Extrude31 (cut)
    with BuildSketch(Plane(origin=(278.112718549, 0, 96.707541395), x_dir=(-0.32843786176743106, 0, 0.9445255798323505), z_dir=(-0.9445255798323505, 0, -0.32843786176743106))):
        with Locations(Location((868.440574361, -60.2, 0), (0, 0, 180))):
            Circle(SKETCH78_R)
    extrude(amount=-CUT_EXTRUDE31_DEPTH, mode=Mode.SUBTRACT)

    # Sketch79 → Boss-Extrude36 (add)
    with BuildSketch(Plane.XZ.offset(66.2)):
        with BuildLine():
            Line((-24.266128585, 978.146354464), (-24.266128585, 988.183184315))
            ThreePointArc((-24.266128585, 988.183184315), (-31.766128585, 984.063765137), (-39.266128585, 988.183184315))
            Line((-39.266128585, 988.183184315), (-39.266128585, 978.146354464))
            Line((-39.266128585, 978.146354464), (-24.266128585, 978.146354464))
        make_face()
    extrude(amount=-BOSS_EXTRUDE36_DEPTH)

    # Sketch81 → Boss-Extrude38 (add)
    with BuildSketch(Plane(origin=(0, -63.2, 0), x_dir=(1, 0, 0), z_dir=(0, 1, 0))):
        with BuildLine():
            Line((11.67040627, -948.187810964), (18.227834043, -929.329880771))
            ThreePointArc((18.227834043, -929.329880771), (5.15828141, -934.170581208), (-1.418744216, -921.882850715))
            Line((-1.418744216, -921.882850715), (-6.699400727, -937.069026653))
            Line((-6.699400727, -937.069026653), (11.67040627, -948.187810964))
        make_face()
    extrude(amount=-BOSS_EXTRUDE38_DEPTH)

    # Sketch82 → Cut-Extrude32 (cut)
    with BuildSketch(Plane.XZ.offset(66.2)):
        Polygon((-32.448883016, 974.886354464), (-36.448883016, 974.886354464), (-36.448883016, 971.886354464), (-28.448883016, 971.886354464), (-28.448883016, 974.886354464), align=None)
    extrude(amount=-CUT_EXTRUDE32_DEPTH, mode=Mode.SUBTRACT)

    # Sketch88 → Cut-Extrude33 (cut)
    with BuildSketch(Plane(origin=(0, -66.2, 0), x_dir=(-1, 0, 0), z_dir=(0, -1, 0))):
        Polygon((0.985313585, -965.693308303), (8.541518224, -963.065805409), (7.556204639, -960.232228669), (0, -962.859731564), align=None)
    extrude(amount=-CUT_EXTRUDE33_DEPTH, mode=Mode.SUBTRACT)

    # Sketch85 → Cut-Extrude34 (cut)
    with BuildSketch(Plane.XZ.offset(66.2)):
        Polygon((4.885275223, 947.396800093), (1.107172904, 946.083048646), (-2.670929416, 944.769297199), (-1.68561583, 941.935720459), (5.870588808, 944.563223353), align=None)
    extrude(amount=-CUT_EXTRUDE34_DEPTH, mode=Mode.SUBTRACT)


solid = body_2_5.part
